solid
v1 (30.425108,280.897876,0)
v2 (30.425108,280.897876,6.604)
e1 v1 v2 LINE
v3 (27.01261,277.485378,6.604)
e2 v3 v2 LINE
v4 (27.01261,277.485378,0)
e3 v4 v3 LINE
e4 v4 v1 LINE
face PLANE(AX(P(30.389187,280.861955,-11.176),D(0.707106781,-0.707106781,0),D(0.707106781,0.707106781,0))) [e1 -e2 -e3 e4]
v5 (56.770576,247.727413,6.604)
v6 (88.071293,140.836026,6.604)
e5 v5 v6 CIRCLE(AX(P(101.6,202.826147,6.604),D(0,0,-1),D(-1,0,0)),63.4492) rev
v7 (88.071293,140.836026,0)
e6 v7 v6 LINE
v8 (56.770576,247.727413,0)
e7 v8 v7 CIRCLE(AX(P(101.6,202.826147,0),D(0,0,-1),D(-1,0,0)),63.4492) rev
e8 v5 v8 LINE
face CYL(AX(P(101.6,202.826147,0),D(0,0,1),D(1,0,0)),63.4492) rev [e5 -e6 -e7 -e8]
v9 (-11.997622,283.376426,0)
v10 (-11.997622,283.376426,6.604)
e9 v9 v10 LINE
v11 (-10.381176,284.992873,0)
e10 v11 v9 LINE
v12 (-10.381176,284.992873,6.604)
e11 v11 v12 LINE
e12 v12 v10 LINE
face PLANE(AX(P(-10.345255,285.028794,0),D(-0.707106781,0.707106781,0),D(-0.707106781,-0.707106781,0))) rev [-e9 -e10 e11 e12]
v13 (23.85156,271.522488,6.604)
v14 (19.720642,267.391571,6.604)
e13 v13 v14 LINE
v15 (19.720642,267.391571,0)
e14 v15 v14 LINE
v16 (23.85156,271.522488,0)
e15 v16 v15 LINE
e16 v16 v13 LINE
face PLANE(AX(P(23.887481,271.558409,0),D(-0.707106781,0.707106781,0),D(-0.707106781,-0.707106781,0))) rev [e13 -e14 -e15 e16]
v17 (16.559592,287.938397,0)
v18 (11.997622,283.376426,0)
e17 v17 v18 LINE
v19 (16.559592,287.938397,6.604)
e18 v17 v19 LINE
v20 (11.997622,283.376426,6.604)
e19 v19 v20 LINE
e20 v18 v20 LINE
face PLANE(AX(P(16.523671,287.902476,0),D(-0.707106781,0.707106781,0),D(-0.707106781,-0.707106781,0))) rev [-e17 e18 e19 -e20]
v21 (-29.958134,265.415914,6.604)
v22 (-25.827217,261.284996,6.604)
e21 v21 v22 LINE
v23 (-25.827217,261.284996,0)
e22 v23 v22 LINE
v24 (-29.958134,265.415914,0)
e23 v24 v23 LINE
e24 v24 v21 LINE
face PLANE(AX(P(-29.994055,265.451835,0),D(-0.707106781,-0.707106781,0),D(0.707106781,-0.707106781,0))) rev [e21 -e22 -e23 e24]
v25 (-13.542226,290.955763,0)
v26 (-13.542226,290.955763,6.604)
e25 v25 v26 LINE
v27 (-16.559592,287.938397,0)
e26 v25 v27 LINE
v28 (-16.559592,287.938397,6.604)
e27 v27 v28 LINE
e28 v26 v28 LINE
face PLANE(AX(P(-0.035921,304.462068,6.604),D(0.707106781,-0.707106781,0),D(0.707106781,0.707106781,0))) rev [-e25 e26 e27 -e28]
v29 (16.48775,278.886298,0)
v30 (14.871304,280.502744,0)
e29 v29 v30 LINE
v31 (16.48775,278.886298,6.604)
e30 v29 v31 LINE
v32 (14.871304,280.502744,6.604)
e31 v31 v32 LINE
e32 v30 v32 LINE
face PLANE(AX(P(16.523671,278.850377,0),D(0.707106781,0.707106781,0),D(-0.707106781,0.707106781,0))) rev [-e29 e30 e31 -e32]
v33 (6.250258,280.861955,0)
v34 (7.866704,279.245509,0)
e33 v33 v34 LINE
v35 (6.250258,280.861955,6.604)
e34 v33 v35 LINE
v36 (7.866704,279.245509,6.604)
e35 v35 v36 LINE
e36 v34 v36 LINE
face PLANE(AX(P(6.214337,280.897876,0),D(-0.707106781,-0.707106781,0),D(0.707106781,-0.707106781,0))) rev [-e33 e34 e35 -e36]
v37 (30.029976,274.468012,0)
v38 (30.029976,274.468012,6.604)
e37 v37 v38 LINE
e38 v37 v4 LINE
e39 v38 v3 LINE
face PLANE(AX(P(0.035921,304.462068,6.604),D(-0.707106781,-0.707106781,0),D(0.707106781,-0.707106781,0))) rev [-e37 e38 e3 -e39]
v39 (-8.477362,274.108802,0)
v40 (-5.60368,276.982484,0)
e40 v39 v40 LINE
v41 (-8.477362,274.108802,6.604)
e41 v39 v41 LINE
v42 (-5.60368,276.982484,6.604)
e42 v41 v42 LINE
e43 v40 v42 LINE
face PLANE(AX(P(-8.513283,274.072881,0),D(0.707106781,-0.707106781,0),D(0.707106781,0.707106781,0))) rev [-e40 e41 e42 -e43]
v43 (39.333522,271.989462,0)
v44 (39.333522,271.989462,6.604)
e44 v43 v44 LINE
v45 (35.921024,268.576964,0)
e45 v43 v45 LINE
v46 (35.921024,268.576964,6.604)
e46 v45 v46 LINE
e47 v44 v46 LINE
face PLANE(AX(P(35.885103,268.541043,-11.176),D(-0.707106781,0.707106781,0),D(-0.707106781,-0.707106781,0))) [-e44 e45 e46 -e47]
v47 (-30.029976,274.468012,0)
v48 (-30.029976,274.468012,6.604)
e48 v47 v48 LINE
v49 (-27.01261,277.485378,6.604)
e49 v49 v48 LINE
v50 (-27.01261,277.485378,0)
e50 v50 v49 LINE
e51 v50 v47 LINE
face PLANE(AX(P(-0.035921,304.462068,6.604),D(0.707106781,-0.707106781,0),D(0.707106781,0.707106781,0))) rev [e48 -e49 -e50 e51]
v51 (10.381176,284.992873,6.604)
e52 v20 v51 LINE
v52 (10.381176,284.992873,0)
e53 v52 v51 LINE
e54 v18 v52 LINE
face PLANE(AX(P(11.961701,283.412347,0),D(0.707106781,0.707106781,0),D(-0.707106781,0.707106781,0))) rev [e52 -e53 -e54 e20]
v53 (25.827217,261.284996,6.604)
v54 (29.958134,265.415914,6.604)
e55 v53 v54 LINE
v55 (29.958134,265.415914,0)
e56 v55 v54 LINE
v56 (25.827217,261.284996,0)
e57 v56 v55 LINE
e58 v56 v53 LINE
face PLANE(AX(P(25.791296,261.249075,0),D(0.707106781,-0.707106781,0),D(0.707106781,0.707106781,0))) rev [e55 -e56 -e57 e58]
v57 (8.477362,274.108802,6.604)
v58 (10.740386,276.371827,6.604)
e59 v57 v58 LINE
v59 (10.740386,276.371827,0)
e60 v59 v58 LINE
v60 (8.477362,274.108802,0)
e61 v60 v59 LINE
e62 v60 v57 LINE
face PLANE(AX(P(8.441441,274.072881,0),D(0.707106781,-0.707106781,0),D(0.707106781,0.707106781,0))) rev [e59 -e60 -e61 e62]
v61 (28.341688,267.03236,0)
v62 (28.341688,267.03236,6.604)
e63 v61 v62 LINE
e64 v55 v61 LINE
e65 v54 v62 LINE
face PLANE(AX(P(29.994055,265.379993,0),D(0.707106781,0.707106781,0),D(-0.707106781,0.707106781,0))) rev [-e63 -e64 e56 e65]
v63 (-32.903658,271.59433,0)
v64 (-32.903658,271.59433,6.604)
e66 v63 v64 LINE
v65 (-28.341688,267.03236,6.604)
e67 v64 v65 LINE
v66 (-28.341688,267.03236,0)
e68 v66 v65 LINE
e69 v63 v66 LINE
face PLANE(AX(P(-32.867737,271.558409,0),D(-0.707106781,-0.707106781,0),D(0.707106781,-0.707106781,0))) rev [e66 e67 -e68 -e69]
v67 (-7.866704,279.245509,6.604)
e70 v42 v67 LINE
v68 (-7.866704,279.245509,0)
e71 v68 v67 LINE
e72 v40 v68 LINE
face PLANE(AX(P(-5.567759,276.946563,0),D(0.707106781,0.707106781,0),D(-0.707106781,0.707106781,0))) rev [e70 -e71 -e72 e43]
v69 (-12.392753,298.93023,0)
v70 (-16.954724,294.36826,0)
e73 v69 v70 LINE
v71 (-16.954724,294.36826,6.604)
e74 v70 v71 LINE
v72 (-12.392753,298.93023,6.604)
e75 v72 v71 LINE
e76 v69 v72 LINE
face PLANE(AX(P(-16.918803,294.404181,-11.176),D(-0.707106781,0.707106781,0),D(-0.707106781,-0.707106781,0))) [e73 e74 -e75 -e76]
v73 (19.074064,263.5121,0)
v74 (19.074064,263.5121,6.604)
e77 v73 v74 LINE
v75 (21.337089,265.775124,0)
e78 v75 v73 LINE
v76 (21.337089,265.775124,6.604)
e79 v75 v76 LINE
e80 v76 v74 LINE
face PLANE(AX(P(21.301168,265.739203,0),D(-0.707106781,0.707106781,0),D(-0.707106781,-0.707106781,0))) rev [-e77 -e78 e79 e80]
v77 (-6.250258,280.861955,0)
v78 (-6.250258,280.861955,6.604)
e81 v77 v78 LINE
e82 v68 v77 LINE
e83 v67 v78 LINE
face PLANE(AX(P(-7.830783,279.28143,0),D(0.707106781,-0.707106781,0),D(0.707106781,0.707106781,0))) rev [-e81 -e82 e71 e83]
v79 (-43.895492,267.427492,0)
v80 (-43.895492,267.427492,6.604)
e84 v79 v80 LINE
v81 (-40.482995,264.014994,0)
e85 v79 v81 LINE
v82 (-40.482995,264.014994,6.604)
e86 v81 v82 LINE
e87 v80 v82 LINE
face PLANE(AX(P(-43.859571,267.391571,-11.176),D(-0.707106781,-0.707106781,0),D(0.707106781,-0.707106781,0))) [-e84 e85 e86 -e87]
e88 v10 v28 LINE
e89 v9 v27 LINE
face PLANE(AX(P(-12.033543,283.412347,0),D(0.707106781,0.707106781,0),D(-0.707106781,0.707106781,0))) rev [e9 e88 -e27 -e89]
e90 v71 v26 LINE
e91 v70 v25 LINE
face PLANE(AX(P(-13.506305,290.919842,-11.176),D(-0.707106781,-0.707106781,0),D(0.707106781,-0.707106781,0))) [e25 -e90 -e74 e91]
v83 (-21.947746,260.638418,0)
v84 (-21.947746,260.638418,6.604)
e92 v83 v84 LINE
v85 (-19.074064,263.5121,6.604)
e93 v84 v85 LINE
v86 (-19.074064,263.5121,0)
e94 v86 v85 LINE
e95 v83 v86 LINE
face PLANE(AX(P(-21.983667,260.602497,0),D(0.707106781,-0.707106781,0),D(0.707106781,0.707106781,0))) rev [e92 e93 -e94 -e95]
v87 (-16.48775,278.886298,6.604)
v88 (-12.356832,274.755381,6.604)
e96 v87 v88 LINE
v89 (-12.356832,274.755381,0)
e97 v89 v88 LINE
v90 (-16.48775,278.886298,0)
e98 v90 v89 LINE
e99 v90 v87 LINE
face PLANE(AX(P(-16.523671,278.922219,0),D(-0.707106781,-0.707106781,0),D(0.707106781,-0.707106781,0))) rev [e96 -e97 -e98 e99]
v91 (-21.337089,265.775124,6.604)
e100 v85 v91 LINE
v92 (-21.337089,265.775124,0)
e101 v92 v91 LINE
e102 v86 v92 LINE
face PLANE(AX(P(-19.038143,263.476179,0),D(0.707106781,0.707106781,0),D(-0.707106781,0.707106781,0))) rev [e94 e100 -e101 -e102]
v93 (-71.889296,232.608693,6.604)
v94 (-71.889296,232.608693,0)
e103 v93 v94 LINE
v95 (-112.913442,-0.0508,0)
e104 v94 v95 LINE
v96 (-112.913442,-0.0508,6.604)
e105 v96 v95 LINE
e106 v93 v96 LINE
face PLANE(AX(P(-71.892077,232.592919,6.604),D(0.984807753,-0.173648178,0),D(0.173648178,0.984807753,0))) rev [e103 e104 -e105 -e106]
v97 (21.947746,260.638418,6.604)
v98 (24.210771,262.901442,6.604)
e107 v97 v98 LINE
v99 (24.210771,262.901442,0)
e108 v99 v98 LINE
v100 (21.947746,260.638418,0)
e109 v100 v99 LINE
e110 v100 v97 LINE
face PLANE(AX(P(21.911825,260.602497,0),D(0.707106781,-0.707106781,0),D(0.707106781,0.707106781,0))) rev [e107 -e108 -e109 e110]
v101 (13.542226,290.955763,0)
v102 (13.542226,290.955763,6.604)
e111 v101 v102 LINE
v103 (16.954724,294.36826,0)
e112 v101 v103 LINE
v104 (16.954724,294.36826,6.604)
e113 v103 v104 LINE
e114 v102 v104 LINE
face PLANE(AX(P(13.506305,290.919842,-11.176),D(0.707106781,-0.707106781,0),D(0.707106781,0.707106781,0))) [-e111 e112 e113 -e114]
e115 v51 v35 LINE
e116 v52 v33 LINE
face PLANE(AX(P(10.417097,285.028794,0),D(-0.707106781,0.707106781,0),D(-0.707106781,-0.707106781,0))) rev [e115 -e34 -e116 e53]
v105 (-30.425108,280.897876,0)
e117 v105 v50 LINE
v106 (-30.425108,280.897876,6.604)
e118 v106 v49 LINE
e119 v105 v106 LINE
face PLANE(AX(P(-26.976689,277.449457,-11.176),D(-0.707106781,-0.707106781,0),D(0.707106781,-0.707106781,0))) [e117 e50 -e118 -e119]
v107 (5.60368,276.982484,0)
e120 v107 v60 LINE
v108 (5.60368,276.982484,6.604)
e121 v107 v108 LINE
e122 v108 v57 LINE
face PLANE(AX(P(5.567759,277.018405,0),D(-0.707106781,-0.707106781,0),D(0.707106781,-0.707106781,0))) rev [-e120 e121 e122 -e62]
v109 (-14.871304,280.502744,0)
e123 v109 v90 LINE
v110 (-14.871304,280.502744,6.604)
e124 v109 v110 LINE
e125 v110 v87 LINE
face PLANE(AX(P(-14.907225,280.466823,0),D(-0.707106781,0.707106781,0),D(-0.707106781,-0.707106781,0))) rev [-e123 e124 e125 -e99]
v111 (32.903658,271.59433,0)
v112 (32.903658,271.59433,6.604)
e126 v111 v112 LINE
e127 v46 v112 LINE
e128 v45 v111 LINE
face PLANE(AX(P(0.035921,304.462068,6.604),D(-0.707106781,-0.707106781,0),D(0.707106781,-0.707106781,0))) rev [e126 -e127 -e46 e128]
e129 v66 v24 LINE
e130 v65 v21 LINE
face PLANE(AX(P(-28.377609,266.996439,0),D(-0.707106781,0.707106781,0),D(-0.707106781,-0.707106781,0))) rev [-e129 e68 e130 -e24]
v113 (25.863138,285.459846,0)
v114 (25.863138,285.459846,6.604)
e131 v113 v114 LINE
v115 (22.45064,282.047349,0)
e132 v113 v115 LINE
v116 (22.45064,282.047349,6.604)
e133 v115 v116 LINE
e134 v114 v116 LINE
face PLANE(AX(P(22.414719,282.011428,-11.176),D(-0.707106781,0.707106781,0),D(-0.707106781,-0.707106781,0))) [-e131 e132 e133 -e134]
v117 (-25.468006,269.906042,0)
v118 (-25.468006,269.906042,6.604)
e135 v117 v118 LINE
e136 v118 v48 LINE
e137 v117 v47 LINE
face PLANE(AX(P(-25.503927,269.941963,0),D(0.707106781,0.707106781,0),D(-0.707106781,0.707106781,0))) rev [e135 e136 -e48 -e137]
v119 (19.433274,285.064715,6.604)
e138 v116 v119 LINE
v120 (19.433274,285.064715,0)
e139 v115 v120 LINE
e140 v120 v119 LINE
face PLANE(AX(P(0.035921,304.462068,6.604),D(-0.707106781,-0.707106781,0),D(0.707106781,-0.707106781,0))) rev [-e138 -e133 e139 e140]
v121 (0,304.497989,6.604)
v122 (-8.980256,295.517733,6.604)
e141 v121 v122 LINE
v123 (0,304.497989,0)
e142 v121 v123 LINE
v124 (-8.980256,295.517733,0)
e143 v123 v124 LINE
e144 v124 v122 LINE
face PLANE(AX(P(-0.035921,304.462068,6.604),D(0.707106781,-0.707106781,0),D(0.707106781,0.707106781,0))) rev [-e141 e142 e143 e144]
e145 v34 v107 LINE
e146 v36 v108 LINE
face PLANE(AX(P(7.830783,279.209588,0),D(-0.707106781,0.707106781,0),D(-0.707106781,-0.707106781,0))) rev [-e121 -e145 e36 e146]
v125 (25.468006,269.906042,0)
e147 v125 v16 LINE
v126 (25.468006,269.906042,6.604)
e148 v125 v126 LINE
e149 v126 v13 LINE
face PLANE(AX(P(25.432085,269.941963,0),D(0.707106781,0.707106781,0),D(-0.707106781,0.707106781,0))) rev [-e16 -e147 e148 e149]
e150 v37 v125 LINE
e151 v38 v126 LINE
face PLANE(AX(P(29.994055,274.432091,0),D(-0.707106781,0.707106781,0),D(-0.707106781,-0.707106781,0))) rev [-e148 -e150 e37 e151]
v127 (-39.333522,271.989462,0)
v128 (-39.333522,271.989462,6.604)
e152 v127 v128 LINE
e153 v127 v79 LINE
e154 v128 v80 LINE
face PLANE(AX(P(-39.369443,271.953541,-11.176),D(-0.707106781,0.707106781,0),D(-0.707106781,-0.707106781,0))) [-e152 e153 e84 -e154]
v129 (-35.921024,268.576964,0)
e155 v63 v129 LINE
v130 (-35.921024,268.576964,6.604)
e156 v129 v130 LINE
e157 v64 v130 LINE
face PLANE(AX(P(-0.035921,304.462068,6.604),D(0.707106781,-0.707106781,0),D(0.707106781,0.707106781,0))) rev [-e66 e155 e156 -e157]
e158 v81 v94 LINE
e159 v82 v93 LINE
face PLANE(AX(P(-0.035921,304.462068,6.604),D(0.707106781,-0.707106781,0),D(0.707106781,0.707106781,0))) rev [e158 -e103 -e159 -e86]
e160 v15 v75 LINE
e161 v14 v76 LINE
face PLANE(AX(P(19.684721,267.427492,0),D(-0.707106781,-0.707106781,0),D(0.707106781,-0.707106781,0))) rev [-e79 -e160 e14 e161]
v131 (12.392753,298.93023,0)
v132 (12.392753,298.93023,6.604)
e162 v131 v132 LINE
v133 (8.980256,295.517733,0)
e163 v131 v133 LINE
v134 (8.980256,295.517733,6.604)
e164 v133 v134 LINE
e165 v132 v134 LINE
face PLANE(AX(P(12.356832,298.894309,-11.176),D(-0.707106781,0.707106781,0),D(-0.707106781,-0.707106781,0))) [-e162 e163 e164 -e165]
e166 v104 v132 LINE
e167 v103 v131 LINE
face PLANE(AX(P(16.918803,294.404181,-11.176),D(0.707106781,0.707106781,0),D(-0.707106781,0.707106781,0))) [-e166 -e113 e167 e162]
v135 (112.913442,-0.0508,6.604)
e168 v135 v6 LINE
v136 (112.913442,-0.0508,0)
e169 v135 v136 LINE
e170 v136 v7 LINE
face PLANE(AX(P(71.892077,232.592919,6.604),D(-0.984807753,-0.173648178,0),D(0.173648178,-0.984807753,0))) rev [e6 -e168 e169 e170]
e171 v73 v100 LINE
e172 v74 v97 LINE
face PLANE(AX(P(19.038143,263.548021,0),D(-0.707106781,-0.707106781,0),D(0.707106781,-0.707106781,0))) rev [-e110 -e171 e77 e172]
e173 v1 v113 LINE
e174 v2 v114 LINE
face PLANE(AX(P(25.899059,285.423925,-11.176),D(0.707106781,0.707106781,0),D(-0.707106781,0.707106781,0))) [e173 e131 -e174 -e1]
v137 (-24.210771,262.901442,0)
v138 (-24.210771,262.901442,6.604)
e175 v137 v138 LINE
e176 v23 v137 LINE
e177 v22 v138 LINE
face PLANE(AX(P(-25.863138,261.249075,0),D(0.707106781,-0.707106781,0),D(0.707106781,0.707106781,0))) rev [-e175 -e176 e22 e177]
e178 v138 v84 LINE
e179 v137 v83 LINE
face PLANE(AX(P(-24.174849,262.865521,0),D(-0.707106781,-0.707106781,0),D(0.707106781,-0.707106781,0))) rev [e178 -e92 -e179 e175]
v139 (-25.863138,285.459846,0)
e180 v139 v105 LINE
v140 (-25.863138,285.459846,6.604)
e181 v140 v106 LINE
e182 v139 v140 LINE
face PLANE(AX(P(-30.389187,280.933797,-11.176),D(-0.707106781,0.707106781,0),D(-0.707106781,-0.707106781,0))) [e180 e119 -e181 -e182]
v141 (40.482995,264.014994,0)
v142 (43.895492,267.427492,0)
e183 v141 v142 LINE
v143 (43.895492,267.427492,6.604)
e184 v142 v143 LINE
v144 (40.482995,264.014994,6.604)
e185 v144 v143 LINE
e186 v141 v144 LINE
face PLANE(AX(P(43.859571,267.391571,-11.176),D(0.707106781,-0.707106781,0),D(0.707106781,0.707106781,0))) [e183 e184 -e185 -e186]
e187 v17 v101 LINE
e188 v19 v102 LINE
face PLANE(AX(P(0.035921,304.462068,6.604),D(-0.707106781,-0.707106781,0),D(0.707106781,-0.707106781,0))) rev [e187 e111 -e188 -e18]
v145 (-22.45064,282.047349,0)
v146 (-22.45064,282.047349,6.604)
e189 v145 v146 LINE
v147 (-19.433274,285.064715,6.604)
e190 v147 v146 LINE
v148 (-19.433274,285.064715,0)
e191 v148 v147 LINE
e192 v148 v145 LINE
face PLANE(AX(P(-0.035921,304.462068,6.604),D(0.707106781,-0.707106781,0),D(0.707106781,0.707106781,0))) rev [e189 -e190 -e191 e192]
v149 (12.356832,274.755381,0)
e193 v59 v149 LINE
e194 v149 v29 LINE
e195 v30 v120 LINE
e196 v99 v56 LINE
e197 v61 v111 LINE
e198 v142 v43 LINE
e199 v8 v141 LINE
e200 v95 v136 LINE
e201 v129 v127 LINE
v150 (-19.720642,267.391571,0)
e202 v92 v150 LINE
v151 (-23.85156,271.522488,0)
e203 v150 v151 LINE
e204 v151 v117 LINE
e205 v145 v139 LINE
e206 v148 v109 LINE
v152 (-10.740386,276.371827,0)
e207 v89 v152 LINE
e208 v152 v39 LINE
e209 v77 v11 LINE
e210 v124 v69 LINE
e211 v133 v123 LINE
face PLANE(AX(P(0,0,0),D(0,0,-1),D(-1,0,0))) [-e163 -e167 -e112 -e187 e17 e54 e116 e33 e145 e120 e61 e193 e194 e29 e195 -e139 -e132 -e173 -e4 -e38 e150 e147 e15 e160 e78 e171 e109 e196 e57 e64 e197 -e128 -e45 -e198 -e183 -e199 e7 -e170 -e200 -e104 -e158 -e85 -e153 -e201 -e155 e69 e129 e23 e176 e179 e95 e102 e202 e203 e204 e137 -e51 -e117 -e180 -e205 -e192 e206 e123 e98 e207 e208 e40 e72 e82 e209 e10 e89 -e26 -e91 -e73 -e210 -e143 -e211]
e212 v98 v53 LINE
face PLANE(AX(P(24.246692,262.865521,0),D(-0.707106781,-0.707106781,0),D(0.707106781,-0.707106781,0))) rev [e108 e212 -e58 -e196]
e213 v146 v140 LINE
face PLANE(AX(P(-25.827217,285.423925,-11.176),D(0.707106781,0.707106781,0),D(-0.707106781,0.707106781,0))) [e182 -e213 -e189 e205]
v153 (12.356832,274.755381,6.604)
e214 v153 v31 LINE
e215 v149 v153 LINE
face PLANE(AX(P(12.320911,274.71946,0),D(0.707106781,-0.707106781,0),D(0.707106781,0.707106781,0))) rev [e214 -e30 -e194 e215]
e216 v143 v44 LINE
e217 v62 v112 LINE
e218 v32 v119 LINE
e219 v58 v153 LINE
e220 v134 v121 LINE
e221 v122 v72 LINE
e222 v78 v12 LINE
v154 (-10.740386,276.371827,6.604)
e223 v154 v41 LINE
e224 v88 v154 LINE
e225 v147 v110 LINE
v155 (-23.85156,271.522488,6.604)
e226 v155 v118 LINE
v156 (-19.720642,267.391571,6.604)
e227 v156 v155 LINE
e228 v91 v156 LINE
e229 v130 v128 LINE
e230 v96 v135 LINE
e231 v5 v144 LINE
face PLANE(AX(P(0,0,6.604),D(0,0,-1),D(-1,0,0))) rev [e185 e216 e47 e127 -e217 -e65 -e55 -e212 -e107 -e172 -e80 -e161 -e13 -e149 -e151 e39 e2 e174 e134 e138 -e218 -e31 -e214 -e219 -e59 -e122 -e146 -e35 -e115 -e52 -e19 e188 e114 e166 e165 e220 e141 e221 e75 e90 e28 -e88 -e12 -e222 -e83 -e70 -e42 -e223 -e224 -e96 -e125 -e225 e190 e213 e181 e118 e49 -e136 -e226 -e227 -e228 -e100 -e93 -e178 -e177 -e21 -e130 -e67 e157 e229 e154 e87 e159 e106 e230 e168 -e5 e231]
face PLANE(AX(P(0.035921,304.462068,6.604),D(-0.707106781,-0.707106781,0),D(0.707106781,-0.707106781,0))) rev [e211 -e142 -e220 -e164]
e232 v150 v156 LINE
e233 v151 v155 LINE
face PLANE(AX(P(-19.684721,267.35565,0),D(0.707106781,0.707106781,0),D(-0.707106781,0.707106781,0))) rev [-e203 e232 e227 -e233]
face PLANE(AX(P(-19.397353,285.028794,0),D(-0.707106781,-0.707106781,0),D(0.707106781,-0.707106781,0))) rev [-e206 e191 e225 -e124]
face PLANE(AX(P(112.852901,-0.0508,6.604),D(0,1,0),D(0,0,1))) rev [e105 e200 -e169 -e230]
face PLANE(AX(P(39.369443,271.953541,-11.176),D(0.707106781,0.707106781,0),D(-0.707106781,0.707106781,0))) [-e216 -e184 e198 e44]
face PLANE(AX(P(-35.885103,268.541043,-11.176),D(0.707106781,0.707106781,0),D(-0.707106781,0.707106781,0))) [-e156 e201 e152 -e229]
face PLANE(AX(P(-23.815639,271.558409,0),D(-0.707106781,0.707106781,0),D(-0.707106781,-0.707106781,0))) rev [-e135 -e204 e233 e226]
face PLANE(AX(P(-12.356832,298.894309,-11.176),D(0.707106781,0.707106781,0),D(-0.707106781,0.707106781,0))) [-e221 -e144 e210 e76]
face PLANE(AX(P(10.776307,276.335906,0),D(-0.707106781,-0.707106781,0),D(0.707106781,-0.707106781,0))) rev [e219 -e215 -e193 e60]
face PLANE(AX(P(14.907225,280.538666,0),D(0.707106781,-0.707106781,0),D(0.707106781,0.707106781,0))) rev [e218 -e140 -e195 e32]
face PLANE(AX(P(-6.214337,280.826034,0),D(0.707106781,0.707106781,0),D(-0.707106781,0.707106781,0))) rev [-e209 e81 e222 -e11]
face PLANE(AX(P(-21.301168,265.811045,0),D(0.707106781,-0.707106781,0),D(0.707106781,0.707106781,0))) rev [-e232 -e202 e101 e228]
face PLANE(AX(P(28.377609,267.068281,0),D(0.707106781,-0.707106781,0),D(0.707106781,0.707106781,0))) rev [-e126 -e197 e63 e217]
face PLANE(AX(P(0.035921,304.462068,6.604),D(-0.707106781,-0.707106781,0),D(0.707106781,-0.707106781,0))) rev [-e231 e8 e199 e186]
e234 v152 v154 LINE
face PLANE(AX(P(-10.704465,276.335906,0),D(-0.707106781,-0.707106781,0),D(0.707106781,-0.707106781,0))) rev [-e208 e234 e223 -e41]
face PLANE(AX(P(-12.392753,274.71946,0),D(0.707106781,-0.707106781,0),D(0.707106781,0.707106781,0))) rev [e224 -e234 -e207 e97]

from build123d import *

# Parameters (mm, degrees)
BOSS_EXTRUDE1_DEPTH = 6.604
CUT_EXTRUDE1_DEPTH  = 325.737846372
BOSS_EXTRUDE2_DEPTH = 6.604
SKETCH6_R           = 63.5
CUT_EXTRUDE2_DEPTH  = 325.737846372
MOVE_FACE1_DEPTH    = 6.604


# Read off the part's stored shape, not the designer's step: Move Face1
with BuildPart() as part:
    # Sketch1 → Boss-Extrude1 (new body)
    with BuildSketch(Plane.XY):
        Polygon((0, 304.426146798), (71.842048969, 232.584097829), (112.8529007, 0), (0, 0), (-112.8529007, 0), (-71.842048969, 232.584097829), align=None)
    extrude(amount=BOSS_EXTRUDE1_DEPTH)

    # Sketch4 → Cut-Extrude1 (cut, through all)
    with BuildSketch(Plane.XY.offset(6.604)):
        Polygon((-11.997622178, 283.448268499), (-16.487750238, 287.93839656), (-19.433274246, 284.992872552), (-14.943146185, 280.502744491), (-16.559592287, 278.88629839), (-12.356832423, 274.683538525), (-10.740386321, 276.299984627), (-8.477361778, 274.036960084), (-5.531837771, 276.982484092), (-7.794862313, 279.245508635), (-6.178416211, 280.861954736), (-10.381176076, 285.064714601), align=None)
        Polygon((-25.468006359, 269.977884318), (-29.95813442, 274.468012378), (-32.903658428, 271.52248837), (-28.413530367, 267.03236031), (-30.029976469, 265.415914208), (-25.827216604, 261.213154343), (-24.210770502, 262.829600445), (-21.94774596, 260.566575903), (-19.002221952, 263.51209991), (-21.265246495, 265.775124453), (-19.648800393, 267.391570555), (-23.851560258, 271.594330419), align=None)
        Polygon((16.487750238, 287.93839656), (11.997622178, 283.448268499), (10.381176076, 285.064714601), (6.178416211, 280.861954736), (7.794862313, 279.245508635), (5.531837771, 276.982484092), (8.477361778, 274.036960084), (10.740386321, 276.299984627), (12.356832423, 274.683538525), (16.559592287, 278.88629839), (14.943146185, 280.502744491), (19.433274246, 284.992872552), align=None)
        Polygon((29.95813442, 274.468012378), (25.468006359, 269.977884318), (23.851560258, 271.594330419), (19.648800393, 267.391570555), (21.265246495, 265.775124453), (19.002221952, 263.51209991), (21.94774596, 260.566575903), (24.210770502, 262.829600445), (25.827216604, 261.213154343), (30.029976469, 265.415914208), (28.413530367, 267.03236031), (32.903658428, 271.52248837), align=None)
    extrude(amount=-CUT_EXTRUDE1_DEPTH, mode=Mode.SUBTRACT)

    # Sketch5 → Boss-Extrude2 (add)
    with BuildSketch(Plane.XY.offset(6.604)):
        Polygon((-12.392753447, 298.858388003), (-8.980256121, 295.445890677), (-13.470384182, 290.955762616), (-16.882881508, 294.368259942), align=None)
        Polygon((-25.863137629, 285.388003821), (-22.450640303, 281.975506495), (-26.940768363, 277.485378435), (-30.353265689, 280.897875761), align=None)
        Polygon((-43.823649871, 267.427491579), (-40.411152545, 264.014994253), (-35.921024484, 268.505122314), (-39.33352181, 271.91761964), align=None)
        Polygon((12.392753447, 298.858388003), (8.980256121, 295.445890677), (13.470384182, 290.955762616), (16.882881508, 294.368259942), align=None)
        Polygon((22.450640303, 281.975506495), (25.863137629, 285.388003821), (30.353265689, 280.897875761), (26.940768363, 277.485378435), align=None)
        Polygon((35.921024484, 268.505122314), (39.33352181, 271.91761964), (43.823649871, 267.427491579), (40.411152545, 264.014994253), align=None)
    extrude(amount=-BOSS_EXTRUDE2_DEPTH)

    # Sketch6 → Cut-Extrude2 (cut, through all)
    with BuildSketch(Plane.XY.offset(6.604)):
        with Locations((101.6, 202.826146798)):
            Circle(SKETCH6_R)
    extrude(amount=-CUT_EXTRUDE2_DEPTH, mode=Mode.SUBTRACT)

    # Move Face1 outline → Move Face1 (add)
    with BuildSketch(Plane.XY):
        with BuildLine():
            Line((56.770575824, 247.727413023), (40.482994594, 264.014994253))
            Line((40.482994594, 264.014994253), (43.89549192, 267.427491579))
            Line((43.89549192, 267.427491579), (39.33352181, 271.989461689))
            Line((39.33352181, 271.989461689), (35.921024484, 268.576964363))
            Line((35.921024484, 268.576964363), (32.903658428, 271.594330419))
            Line((32.903658428, 271.594330419), (28.341688318, 267.03236031))
            Line((28.341688318, 267.03236031), (29.95813442, 265.415914208))
            Line((29.95813442, 265.415914208), (25.827216604, 261.284996392))
            Line((25.827216604, 261.284996392), (24.210770502, 262.901442494))
            Line((24.210770502, 262.901442494), (21.94774596, 260.638417952))
            Line((21.94774596, 260.638417952), (19.074064001, 263.51209991))
            Line((19.074064001, 263.51209991), (21.337088544, 265.775124453))
            Line((21.337088544, 265.775124453), (19.720642442, 267.391570555))
            Line((19.720642442, 267.391570555), (23.851560258, 271.52248837))
            Line((23.851560258, 271.52248837), (25.468006359, 269.906042269))
            Line((25.468006359, 269.906042269), (30.029976469, 274.468012378))
            Line((30.029976469, 274.468012378), (27.012610412, 277.485378435))
            Line((27.012610412, 277.485378435), (30.425107738, 280.897875761))
            Line((30.425107738, 280.897875761), (25.863137629, 285.45984587))
            Line((25.863137629, 285.45984587), (22.450640303, 282.047348544))
            Line((22.450640303, 282.047348544), (19.433274246, 285.064714601))
            Line((19.433274246, 285.064714601), (14.871304136, 280.502744491))
            Line((14.871304136, 280.502744491), (16.487750238, 278.88629839))
            Line((16.487750238, 278.88629839), (12.356832423, 274.755380574))
            Line((12.356832423, 274.755380574), (10.740386321, 276.371826676))
            Line((10.740386321, 276.371826676), (8.477361778, 274.108802133))
            Line((8.477361778, 274.108802133), (5.60367982, 276.982484092))
            Line((5.60367982, 276.982484092), (7.866704362, 279.245508635))
            Line((7.866704362, 279.245508635), (6.25025826, 280.861954736))
            Line((6.25025826, 280.861954736), (10.381176076, 284.992872552))
            Line((10.381176076, 284.992872552), (11.997622178, 283.37642645))
            Line((11.997622178, 283.37642645), (16.559592287, 287.93839656))
            Line((16.559592287, 287.93839656), (13.542226231, 290.955762616))
            Line((13.542226231, 290.955762616), (16.954723557, 294.368259942))
            Line((16.954723557, 294.368259942), (12.392753447, 298.930230052))
            Line((12.392753447, 298.930230052), (8.980256121, 295.517732726))
            Line((8.980256121, 295.517732726), (0, 304.497988847))
            Line((0, 304.497988847), (-8.980256121, 295.517732726))
            Line((-8.980256121, 295.517732726), (-12.392753447, 298.930230052))
            Line((-12.392753447, 298.930230052), (-16.954723557, 294.368259942))
            Line((-16.954723557, 294.368259942), (-13.542226231, 290.955762616))
            Line((-13.542226231, 290.955762616), (-16.559592287, 287.93839656))
            Line((-16.559592287, 287.93839656), (-11.997622178, 283.37642645))
            Line((-11.997622178, 283.37642645), (-10.381176076, 284.992872552))
            Line((-10.381176076, 284.992872552), (-6.25025826, 280.861954736))
            Line((-6.25025826, 280.861954736), (-7.866704362, 279.245508635))
            Line((-7.866704362, 279.245508635), (-5.60367982, 276.982484092))
            Line((-5.60367982, 276.982484092), (-8.477361778, 274.108802133))
            Line((-8.477361778, 274.108802133), (-10.740386321, 276.371826676))
            Line((-10.740386321, 276.371826676), (-12.356832423, 274.755380574))
            Line((-12.356832423, 274.755380574), (-16.487750238, 278.88629839))
            Line((-16.487750238, 278.88629839), (-14.871304136, 280.502744491))
            Line((-14.871304136, 280.502744491), (-19.433274246, 285.064714601))
            Line((-19.433274246, 285.064714601), (-22.450640303, 282.047348544))
            Line((-22.450640303, 282.047348544), (-25.863137629, 285.45984587))
            Line((-25.863137629, 285.45984587), (-30.425107738, 280.897875761))
            Line((-30.425107738, 280.897875761), (-27.012610412, 277.485378435))
            Line((-27.012610412, 277.485378435), (-30.029976469, 274.468012378))
            Line((-30.029976469, 274.468012378), (-25.468006359, 269.906042269))
            Line((-25.468006359, 269.906042269), (-23.851560258, 271.52248837))
            Line((-23.851560258, 271.52248837), (-19.720642442, 267.391570555))
            Line((-19.720642442, 267.391570555), (-21.337088544, 265.775124453))
            Line((-21.337088544, 265.775124453), (-19.074064001, 263.51209991))
            Line((-19.074064001, 263.51209991), (-21.94774596, 260.638417952))
            Line((-21.94774596, 260.638417952), (-24.210770502, 262.901442494))
            Line((-24.210770502, 262.901442494), (-25.827216604, 261.284996392))
            Line((-25.827216604, 261.284996392), (-29.95813442, 265.415914208))
            Line((-29.95813442, 265.415914208), (-28.341688318, 267.03236031))
            Line((-28.341688318, 267.03236031), (-32.903658428, 271.594330419))
            Line((-32.903658428, 271.594330419), (-35.921024484, 268.576964363))
            Line((-35.921024484, 268.576964363), (-39.33352181, 271.989461689))
            Line((-39.33352181, 271.989461689), (-43.89549192, 267.427491579))
            Line((-43.89549192, 267.427491579), (-40.482994594, 264.014994253))
            Line((-40.482994594, 264.014994253), (-71.889295849, 232.608692998))
            Line((-71.889295849, 232.608692998), (-112.913441782, -0.0508))
            Line((-112.913441782, -0.0508), (112.913441782, -0.0508))
            Line((112.913441782, -0.0508), (88.071293124, 140.836026046))
            ThreePointArc((88.071293124, 140.836026046), (40.707800027, 184.995247686), (56.770575824, 247.727413023))
        make_face()
        with BuildLine():
            Line((43.823649871, 267.427491579), (40.411152545, 264.014994253))
            Line((40.411152545, 264.014994253), (56.698719395, 247.727427403))
            ThreePointArc((56.698719395, 247.727427403), (40.661404518, 184.972923541), (88.027178445, 140.793667281))
            Line((88.027178445, 140.793667281), (112.8529007, 0))
            Line((112.8529007, 0), (-112.8529007, 0))
            Line((-112.8529007, 0), (-71.842048969, 232.584097829))
            Line((-71.842048969, 232.584097829), (-40.411152545, 264.014994253))
            Line((-40.411152545, 264.014994253), (-43.823649871, 267.427491579))
            Line((-43.823649871, 267.427491579), (-39.33352181, 271.91761964))
            Line((-39.33352181, 271.91761964), (-35.921024484, 268.505122314))
            Line((-35.921024484, 268.505122314), (-32.903658428, 271.52248837))
            Line((-32.903658428, 271.52248837), (-28.413530367, 267.03236031))
            Line((-28.413530367, 267.03236031), (-30.029976469, 265.415914208))
            Line((-30.029976469, 265.415914208), (-25.827216604, 261.213154343))
            Line((-25.827216604, 261.213154343), (-24.210770502, 262.829600445))
            Line((-24.210770502, 262.829600445), (-21.94774596, 260.566575903))
            Line((-21.94774596, 260.566575903), (-19.002221952, 263.51209991))
            Line((-19.002221952, 263.51209991), (-21.265246495, 265.775124453))
            Line((-21.265246495, 265.775124453), (-19.648800393, 267.391570555))
            Line((-19.648800393, 267.391570555), (-23.851560258, 271.594330419))
            Line((-23.851560258, 271.594330419), (-25.468006359, 269.977884318))
            Line((-25.468006359, 269.977884318), (-29.95813442, 274.468012378))
            Line((-29.95813442, 274.468012378), (-26.940768363, 277.485378435))
            Line((-26.940768363, 277.485378435), (-30.353265689, 280.897875761))
            Line((-30.353265689, 280.897875761), (-25.863137629, 285.388003821))
            Line((-25.863137629, 285.388003821), (-22.450640303, 281.975506495))
            Line((-22.450640303, 281.975506495), (-19.433274246, 284.992872552))
            Line((-19.433274246, 284.992872552), (-14.943146185, 280.502744491))
            Line((-14.943146185, 280.502744491), (-16.559592287, 278.88629839))
            Line((-16.559592287, 278.88629839), (-12.356832423, 274.683538525))
            Line((-12.356832423, 274.683538525), (-10.740386321, 276.299984627))
            Line((-10.740386321, 276.299984627), (-8.477361778, 274.036960084))
            Line((-8.477361778, 274.036960084), (-5.531837771, 276.982484092))
            Line((-5.531837771, 276.982484092), (-7.794862313, 279.245508635))
            Line((-7.794862313, 279.245508635), (-6.178416211, 280.861954736))
            Line((-6.178416211, 280.861954736), (-10.381176076, 285.064714601))
            Line((-10.381176076, 285.064714601), (-11.997622178, 283.448268499))
            Line((-11.997622178, 283.448268499), (-16.487750238, 287.93839656))
            Line((-16.487750238, 287.93839656), (-13.470384182, 290.955762616))
            Line((-13.470384182, 290.955762616), (-16.882881508, 294.368259942))
            Line((-16.882881508, 294.368259942), (-12.392753447, 298.858388003))
            Line((-12.392753447, 298.858388003), (-8.980256121, 295.445890677))
            Line((-8.980256121, 295.445890677), (0, 304.426146798))
            Line((0, 304.426146798), (8.980256121, 295.445890677))
            Line((8.980256121, 295.445890677), (12.392753447, 298.858388003))
            Line((12.392753447, 298.858388003), (16.882881508, 294.368259942))
            Line((16.882881508, 294.368259942), (13.470384182, 290.955762616))
            Line((13.470384182, 290.955762616), (16.487750238, 287.93839656))
            Line((16.487750238, 287.93839656), (11.997622178, 283.448268499))
            Line((11.997622178, 283.448268499), (10.381176076, 285.064714601))
            Line((10.381176076, 285.064714601), (6.178416211, 280.861954736))
            Line((6.178416211, 280.861954736), (7.794862313, 279.245508635))
            Line((7.794862313, 279.245508635), (5.531837771, 276.982484092))
            Line((5.531837771, 276.982484092), (8.477361778, 274.036960084))
            Line((8.477361778, 274.036960084), (10.740386321, 276.299984627))
            Line((10.740386321, 276.299984627), (12.356832423, 274.683538525))
            Line((12.356832423, 274.683538525), (16.559592287, 278.88629839))
            Line((16.559592287, 278.88629839), (14.943146185, 280.502744491))
            Line((14.943146185, 280.502744491), (19.433274246, 284.992872552))
            Line((19.433274246, 284.992872552), (22.450640303, 281.975506495))
            Line((22.450640303, 281.975506495), (25.863137629, 285.388003821))
            Line((25.863137629, 285.388003821), (30.353265689, 280.897875761))
            Line((30.353265689, 280.897875761), (26.940768363, 277.485378435))
            Line((26.940768363, 277.485378435), (29.95813442, 274.468012378))
            Line((29.95813442, 274.468012378), (25.468006359, 269.977884318))
            Line((25.468006359, 269.977884318), (23.851560258, 271.594330419))
            Line((23.851560258, 271.594330419), (19.648800393, 267.391570555))
            Line((19.648800393, 267.391570555), (21.265246495, 265.775124453))
            Line((21.265246495, 265.775124453), (19.002221952, 263.51209991))
            Line((19.002221952, 263.51209991), (21.94774596, 260.566575903))
            Line((21.94774596, 260.566575903), (24.210770502, 262.829600445))
            Line((24.210770502, 262.829600445), (25.827216604, 261.213154343))
            Line((25.827216604, 261.213154343), (30.029976469, 265.415914208))
            Line((30.029976469, 265.415914208), (28.413530367, 267.03236031))
            Line((28.413530367, 267.03236031), (32.903658428, 271.52248837))
            Line((32.903658428, 271.52248837), (35.921024484, 268.505122314))
            Line((35.921024484, 268.505122314), (39.33352181, 271.91761964))
            Line((39.33352181, 271.91761964), (43.823649871, 267.427491579))
        make_face(mode=Mode.SUBTRACT)
    extrude(amount=MOVE_FACE1_DEPTH)


solid = part.part
